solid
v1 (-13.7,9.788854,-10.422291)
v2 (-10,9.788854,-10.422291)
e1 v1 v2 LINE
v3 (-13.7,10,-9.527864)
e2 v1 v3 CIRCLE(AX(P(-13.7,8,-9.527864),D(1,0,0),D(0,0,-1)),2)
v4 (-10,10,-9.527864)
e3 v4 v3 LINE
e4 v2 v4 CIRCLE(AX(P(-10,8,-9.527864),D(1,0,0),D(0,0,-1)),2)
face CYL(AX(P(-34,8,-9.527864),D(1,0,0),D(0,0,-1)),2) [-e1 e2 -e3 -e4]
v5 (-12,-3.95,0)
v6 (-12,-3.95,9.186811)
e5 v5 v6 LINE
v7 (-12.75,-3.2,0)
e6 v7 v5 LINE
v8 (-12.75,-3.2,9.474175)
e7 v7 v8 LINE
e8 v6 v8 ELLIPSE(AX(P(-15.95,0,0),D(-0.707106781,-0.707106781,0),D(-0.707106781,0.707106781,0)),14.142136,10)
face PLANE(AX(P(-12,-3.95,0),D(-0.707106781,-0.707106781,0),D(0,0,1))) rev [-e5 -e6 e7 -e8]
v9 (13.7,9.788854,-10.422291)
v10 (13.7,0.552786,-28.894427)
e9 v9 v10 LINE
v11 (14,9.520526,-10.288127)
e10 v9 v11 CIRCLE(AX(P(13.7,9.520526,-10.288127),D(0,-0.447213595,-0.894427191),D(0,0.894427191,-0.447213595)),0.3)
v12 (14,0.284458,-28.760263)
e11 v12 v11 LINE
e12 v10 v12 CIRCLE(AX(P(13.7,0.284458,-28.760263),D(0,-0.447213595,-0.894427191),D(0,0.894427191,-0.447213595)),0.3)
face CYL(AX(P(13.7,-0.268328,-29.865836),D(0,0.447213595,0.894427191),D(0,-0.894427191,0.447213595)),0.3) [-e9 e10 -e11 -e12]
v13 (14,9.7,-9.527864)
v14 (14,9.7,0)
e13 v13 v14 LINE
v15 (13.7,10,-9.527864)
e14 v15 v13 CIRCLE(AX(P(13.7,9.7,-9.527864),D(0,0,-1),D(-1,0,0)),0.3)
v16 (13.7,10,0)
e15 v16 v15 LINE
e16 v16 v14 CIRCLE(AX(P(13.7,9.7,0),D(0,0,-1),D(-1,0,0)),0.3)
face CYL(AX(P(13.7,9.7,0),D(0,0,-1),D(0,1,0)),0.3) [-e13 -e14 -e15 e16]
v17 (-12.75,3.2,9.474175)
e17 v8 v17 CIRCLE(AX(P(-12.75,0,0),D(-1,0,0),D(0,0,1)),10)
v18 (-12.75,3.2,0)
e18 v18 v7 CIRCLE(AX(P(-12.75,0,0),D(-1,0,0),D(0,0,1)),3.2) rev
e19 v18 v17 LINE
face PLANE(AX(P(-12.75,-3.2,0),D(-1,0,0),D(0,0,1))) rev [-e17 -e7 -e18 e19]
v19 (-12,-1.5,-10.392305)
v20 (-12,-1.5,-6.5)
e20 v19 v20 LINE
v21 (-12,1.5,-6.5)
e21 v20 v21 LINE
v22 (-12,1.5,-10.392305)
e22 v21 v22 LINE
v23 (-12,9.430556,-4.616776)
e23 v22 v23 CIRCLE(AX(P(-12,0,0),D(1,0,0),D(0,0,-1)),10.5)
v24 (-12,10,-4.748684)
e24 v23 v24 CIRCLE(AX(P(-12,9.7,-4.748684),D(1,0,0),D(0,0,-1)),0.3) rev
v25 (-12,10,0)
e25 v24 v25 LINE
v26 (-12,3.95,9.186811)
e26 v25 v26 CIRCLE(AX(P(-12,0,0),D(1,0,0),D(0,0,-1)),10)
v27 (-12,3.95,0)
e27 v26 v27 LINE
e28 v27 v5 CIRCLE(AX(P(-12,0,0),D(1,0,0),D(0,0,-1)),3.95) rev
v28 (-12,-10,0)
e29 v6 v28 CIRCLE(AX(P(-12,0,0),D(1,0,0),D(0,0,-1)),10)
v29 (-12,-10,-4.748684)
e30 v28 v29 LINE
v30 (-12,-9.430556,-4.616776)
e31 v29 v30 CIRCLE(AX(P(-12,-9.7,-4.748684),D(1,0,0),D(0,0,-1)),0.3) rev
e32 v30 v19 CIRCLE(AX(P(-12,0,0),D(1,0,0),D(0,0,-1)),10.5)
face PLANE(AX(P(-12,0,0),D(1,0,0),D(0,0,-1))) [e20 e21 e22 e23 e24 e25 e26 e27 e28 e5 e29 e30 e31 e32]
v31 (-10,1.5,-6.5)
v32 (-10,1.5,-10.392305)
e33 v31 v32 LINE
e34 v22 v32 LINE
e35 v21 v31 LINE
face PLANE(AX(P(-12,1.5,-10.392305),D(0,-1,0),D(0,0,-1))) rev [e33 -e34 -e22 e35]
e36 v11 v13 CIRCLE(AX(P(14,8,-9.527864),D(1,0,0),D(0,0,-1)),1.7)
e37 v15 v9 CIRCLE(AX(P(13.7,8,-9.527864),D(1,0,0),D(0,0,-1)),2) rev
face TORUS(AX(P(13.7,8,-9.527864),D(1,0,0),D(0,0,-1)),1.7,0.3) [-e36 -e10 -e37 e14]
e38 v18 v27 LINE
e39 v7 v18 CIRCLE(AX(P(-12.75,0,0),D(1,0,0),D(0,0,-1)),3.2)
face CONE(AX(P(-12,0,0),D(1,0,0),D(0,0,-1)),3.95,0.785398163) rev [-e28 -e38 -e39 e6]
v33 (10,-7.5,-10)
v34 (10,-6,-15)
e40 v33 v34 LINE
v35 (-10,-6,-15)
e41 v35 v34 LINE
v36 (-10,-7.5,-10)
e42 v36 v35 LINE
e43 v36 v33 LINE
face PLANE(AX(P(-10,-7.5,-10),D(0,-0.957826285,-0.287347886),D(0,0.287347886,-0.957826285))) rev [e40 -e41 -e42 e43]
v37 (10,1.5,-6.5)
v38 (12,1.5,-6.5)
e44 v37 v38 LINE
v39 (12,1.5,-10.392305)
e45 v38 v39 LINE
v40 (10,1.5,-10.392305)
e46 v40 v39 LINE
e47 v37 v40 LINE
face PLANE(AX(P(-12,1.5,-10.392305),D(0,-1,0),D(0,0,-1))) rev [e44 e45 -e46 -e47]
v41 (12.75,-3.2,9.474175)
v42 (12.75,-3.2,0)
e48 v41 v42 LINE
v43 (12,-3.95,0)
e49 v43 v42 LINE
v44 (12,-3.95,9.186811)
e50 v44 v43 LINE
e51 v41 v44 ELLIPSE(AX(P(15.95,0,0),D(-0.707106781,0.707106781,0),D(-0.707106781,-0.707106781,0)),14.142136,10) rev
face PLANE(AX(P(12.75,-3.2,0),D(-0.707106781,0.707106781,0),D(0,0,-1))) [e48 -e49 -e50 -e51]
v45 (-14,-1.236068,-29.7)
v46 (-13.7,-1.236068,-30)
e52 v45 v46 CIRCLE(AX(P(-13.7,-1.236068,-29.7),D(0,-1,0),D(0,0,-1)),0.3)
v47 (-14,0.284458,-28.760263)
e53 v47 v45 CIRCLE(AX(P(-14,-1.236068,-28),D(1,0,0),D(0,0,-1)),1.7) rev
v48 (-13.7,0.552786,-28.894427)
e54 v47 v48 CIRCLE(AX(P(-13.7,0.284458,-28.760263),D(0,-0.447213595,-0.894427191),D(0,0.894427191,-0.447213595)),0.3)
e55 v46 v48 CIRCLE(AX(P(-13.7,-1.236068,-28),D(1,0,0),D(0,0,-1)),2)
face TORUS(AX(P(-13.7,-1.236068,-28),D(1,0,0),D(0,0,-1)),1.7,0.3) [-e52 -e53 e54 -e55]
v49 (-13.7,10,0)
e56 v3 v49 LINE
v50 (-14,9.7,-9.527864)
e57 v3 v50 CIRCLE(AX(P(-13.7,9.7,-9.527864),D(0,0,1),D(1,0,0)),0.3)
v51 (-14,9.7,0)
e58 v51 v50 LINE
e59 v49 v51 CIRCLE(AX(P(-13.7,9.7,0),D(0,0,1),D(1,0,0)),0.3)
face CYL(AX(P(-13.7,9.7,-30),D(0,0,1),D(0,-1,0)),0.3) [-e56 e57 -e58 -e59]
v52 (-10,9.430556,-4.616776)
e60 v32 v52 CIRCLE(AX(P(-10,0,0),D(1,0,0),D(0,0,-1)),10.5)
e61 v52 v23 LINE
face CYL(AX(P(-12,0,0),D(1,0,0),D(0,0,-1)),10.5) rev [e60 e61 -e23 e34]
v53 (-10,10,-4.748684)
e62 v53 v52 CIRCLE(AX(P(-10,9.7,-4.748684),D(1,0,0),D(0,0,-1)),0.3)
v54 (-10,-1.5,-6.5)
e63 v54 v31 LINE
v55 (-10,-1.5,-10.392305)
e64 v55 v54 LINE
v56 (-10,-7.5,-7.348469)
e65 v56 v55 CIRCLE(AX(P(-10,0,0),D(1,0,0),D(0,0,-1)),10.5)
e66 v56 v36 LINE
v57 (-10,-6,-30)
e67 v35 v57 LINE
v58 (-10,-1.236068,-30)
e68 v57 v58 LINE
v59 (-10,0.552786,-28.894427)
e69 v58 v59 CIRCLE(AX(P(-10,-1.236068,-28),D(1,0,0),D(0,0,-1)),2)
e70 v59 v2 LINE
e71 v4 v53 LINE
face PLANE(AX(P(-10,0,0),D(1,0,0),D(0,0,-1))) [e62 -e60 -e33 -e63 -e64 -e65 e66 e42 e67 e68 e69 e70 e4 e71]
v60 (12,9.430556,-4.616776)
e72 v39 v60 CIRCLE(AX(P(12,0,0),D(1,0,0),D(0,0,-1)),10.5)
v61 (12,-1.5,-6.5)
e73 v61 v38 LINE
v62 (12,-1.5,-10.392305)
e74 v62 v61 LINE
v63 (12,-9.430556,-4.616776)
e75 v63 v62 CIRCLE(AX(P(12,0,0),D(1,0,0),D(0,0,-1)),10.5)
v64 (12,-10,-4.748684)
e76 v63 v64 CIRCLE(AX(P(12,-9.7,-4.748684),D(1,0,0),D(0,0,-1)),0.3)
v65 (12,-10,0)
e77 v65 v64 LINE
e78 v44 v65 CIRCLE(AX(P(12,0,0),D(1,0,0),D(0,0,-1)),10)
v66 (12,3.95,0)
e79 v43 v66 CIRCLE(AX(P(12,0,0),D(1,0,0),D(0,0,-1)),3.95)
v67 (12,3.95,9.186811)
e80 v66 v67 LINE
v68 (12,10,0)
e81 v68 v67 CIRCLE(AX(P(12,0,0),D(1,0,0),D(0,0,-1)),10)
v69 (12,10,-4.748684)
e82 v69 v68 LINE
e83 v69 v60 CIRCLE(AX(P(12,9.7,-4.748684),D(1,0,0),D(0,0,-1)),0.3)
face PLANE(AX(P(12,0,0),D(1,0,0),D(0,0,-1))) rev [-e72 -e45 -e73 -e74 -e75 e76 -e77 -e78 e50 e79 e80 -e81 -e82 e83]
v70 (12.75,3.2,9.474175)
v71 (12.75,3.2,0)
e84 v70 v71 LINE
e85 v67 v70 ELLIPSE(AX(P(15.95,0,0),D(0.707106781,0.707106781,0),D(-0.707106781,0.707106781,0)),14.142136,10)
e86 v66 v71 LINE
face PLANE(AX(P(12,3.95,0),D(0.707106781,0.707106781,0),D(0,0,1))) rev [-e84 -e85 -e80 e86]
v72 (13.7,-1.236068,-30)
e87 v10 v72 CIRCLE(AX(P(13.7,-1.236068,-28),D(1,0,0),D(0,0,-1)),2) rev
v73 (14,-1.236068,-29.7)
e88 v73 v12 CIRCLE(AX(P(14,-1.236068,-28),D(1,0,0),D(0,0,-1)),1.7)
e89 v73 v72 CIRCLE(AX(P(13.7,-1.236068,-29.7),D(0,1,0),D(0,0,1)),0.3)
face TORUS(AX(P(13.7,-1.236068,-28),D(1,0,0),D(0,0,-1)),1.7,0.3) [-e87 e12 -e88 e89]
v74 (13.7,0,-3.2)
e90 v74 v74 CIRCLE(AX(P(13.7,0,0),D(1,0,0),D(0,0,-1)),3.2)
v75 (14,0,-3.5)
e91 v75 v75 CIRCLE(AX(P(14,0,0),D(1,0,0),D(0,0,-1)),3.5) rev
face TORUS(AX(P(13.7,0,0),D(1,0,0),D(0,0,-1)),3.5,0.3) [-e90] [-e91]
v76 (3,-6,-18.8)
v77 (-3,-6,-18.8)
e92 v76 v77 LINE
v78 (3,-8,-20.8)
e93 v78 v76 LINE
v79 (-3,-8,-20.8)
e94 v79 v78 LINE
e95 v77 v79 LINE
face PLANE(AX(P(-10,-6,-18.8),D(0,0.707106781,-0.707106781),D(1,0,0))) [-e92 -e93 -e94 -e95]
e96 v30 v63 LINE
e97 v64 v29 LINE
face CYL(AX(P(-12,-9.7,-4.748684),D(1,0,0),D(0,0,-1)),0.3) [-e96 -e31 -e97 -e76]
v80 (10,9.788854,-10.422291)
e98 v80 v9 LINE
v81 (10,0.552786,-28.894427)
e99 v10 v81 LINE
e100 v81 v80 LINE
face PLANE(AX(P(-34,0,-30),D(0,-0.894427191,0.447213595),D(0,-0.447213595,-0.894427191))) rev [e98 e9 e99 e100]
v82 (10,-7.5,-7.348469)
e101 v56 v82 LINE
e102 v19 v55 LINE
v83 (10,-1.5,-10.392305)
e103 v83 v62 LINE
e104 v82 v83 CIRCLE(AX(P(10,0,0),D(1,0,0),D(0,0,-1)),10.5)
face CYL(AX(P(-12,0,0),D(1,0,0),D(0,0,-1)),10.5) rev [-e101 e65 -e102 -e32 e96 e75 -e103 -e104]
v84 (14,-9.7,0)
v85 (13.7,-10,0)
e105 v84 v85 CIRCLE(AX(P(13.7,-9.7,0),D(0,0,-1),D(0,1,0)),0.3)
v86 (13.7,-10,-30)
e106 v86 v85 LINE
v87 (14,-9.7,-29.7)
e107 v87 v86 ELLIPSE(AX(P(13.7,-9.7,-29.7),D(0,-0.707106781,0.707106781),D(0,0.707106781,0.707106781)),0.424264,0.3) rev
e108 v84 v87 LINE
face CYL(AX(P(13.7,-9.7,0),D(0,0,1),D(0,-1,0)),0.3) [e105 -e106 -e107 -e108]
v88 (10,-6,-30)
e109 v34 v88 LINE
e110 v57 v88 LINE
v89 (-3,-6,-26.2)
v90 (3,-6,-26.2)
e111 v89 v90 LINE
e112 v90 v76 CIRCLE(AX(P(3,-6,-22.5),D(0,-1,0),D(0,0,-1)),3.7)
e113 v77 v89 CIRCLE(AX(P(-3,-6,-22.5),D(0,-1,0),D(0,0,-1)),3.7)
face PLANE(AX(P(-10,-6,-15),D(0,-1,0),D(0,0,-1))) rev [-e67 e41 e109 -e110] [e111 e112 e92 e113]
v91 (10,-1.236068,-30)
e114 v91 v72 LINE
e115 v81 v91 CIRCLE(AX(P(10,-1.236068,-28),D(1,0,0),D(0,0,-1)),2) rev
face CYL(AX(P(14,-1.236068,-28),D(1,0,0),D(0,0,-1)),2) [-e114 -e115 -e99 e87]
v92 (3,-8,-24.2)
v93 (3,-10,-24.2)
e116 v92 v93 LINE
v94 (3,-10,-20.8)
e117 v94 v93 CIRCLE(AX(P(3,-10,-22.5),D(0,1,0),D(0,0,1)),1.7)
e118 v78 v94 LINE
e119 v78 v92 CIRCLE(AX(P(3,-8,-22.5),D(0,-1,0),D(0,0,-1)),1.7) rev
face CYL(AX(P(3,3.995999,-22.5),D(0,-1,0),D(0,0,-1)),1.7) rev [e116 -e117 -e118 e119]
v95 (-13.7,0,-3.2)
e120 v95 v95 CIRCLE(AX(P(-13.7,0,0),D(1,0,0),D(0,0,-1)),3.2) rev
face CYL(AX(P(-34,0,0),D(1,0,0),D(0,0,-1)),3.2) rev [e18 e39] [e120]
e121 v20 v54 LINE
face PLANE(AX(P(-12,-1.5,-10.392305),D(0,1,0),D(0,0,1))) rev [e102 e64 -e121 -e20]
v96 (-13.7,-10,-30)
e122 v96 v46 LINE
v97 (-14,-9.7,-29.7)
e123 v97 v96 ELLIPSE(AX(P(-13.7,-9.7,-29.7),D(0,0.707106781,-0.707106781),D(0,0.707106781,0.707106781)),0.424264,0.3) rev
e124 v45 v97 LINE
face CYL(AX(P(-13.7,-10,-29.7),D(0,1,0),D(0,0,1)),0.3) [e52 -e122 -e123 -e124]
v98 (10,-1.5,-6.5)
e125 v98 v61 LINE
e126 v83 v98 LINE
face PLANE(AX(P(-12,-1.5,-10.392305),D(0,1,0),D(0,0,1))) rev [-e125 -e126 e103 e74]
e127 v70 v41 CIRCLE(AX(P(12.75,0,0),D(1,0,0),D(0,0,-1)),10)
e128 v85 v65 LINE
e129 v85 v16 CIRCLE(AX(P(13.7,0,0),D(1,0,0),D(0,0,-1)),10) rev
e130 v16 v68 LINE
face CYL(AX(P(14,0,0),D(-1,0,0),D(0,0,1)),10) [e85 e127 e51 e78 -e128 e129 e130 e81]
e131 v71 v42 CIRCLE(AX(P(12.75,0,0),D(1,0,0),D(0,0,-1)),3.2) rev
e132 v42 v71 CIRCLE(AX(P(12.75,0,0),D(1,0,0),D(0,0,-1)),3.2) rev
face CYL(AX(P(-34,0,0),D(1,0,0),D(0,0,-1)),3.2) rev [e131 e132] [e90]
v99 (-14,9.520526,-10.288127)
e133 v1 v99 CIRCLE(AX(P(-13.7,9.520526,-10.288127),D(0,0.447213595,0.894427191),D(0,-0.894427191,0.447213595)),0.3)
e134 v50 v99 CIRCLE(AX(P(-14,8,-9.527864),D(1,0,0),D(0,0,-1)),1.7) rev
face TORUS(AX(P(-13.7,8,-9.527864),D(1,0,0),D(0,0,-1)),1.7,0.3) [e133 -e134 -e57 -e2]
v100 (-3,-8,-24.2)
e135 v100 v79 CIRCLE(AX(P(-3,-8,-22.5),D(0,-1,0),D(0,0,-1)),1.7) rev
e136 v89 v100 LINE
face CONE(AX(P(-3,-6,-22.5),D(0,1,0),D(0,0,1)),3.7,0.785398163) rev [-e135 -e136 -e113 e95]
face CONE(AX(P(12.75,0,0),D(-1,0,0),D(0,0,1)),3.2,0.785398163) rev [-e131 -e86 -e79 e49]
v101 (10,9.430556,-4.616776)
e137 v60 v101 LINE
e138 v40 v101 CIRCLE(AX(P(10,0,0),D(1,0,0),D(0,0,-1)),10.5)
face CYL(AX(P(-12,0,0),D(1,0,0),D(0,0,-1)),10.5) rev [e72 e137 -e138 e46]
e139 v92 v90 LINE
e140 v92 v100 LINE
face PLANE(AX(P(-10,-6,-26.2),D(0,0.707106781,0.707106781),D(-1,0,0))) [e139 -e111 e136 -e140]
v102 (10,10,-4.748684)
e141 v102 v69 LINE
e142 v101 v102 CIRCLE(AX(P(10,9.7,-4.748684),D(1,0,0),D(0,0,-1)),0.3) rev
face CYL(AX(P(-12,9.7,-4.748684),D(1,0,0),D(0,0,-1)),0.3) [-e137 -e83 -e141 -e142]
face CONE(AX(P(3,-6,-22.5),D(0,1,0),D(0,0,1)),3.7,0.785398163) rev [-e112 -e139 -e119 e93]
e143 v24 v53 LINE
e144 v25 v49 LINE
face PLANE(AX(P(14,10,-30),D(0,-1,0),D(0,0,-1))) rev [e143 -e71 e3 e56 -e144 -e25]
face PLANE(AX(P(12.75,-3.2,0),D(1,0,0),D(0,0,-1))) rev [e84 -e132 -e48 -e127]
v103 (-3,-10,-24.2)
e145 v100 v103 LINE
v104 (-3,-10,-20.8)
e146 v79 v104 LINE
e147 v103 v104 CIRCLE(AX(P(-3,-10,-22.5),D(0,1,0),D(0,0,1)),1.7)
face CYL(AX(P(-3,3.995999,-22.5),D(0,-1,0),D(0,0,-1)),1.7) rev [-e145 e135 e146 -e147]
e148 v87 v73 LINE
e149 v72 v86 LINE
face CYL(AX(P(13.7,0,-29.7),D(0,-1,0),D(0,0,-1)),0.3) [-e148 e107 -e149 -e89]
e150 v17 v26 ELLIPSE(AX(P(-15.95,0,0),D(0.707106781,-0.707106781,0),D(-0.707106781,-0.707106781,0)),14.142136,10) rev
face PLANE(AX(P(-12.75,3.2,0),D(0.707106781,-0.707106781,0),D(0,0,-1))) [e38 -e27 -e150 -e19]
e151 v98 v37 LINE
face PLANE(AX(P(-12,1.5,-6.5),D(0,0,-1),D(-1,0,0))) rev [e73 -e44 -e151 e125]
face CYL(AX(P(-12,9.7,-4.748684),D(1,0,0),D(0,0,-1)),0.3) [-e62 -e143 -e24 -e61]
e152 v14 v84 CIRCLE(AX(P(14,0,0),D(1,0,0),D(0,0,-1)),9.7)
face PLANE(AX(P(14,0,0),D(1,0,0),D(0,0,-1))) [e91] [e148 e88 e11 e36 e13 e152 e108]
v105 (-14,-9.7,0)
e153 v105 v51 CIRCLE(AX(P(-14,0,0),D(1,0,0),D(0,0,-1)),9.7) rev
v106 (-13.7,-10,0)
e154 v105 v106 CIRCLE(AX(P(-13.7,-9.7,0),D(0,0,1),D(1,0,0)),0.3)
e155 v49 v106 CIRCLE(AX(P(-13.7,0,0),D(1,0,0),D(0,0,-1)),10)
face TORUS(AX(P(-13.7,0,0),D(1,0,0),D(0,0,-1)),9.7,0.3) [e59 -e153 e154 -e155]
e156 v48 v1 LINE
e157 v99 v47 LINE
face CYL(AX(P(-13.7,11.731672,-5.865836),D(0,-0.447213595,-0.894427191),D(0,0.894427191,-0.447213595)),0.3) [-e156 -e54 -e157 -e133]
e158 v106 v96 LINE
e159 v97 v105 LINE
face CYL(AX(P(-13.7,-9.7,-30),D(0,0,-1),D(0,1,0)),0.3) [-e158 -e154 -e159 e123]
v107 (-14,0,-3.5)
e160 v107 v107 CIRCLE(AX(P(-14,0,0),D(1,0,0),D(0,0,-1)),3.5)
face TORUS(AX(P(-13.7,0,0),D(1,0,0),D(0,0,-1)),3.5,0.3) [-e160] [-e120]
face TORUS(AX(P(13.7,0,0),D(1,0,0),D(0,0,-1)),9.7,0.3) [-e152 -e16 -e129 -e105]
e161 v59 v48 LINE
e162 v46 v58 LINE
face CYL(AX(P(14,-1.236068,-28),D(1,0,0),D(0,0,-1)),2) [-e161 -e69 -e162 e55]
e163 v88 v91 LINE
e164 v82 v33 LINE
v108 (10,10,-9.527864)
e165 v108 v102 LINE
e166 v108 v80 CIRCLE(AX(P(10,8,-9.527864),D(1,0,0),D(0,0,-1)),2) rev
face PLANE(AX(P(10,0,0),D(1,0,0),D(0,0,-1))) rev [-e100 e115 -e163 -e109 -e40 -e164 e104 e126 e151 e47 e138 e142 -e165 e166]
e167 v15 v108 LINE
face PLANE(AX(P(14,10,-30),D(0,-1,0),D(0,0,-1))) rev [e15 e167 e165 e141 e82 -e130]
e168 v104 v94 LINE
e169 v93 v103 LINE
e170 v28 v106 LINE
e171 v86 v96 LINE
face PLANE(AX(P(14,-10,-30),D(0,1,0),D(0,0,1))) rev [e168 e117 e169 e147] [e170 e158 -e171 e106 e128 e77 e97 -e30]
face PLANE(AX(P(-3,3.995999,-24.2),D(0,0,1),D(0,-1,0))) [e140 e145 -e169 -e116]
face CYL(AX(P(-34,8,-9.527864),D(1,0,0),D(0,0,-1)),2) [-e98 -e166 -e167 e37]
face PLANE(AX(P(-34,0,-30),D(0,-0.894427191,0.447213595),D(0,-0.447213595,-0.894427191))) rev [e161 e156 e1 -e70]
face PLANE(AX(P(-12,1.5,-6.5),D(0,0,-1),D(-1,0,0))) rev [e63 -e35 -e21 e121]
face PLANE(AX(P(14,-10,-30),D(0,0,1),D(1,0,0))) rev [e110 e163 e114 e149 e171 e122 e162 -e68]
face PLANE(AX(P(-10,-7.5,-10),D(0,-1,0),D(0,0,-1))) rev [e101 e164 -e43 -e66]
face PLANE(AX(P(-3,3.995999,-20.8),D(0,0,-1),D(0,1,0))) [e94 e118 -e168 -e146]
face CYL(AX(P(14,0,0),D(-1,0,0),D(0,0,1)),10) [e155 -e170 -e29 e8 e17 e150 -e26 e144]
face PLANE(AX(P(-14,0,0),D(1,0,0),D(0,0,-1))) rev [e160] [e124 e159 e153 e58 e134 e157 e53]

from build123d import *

# Parameters (mm, degrees)
BOSS_EXTRUDE1_DEPTH = 14
SKETCH2_R           = 3.2
CUT_EXTRUDE1_DEPTH  = 48
CUT_EXTRUDE2_DEPTH  = 10
CUT_EXTRUDE4_DEPTH  = 12
FILLET1_R           = 0.3
CUT_EXTRUDE3_DEPTH  = 4
CHAMFER1_SIZE       = 2
FILLET2_R           = 2
FILLET3_R           = 0.3
SKETCH7_W           = 25.5
SKETCH7_H           = 10
CUT_EXTRUDE5_DEPTH  = 3.2
CHAMFER2_SIZE       = 0.75


with BuildPart() as part:
    # Sketch1 → Boss-Extrude1 (new, symmetric)
    with BuildSketch(Plane(origin=(0, 0, 0), x_dir=(0, 0, -1), z_dir=(1, 0, 0))):
        with BuildLine():
            Line((30, -10), (0, -10))
            ThreePointArc((0, -10), (-10, 0), (0, 10))
            Line((0, 10), (30, 10))
            Line((30, 10), (30, -10))
        make_face()
    extrude(amount=BOSS_EXTRUDE1_DEPTH, both=True)

    # Sketch2 → Cut-Extrude1 (cut)
    with BuildSketch(Plane(origin=(14, 0, 0), x_dir=(0, 0, -1), z_dir=(1, 0, 0))):
        Circle(SKETCH2_R)
        Polygon((30, 0), (10, 10), (30, 10), align=None)
    extrude(amount=-CUT_EXTRUDE1_DEPTH, mode=Mode.SUBTRACT)

    # Sketch4 → Cut-Extrude2 (cut, symmetric)
    with BuildSketch(Plane(origin=(0, 0, 0), x_dir=(0, 0, -1), z_dir=(1, 0, 0))):
        with BuildLine():
            Line((0, -10), (1.5, -10))
            Line((1.5, -10), (1.5, -7.5))
            Line((1.5, -7.5), (10, -7.5))
            Line((10, -7.5), (15, -6))
            Line((15, -6), (30, -6))
            Line((30, -6), (30, 0))
            Line((30, 0), (10, 10))
            Line((10, 10), (0, 10))
            ThreePointArc((0, 10), (-10, 0), (0, -10))
        make_face()
    extrude(amount=CUT_EXTRUDE2_DEPTH, both=True, mode=Mode.SUBTRACT)

    # Sketch6 → Cut-Extrude4 (cut, symmetric)
    with BuildSketch(Plane(origin=(0, 0, 0), x_dir=(0, 0, -1), z_dir=(1, 0, 0))):
        with BuildLine():
            Line((10.392304845, 1.5), (6.5, 1.5))
            Line((6.5, 1.5), (6.5, -1.5))
            Line((6.5, -1.5), (10.392304845, -1.5))
            ThreePointArc((10.392304845, -1.5), (-10.5, 0), (10.392304845, 1.5))
        make_face()
    extrude(amount=CUT_EXTRUDE4_DEPTH, both=True, mode=Mode.SUBTRACT)

    # Fillet1
    fillet1_edges = [part.edges().sort_by_distance(p)[0] for p in [
        (0, -10, -3.201562119),
        (-11, 10, -3.201562119),
        (11, 10, -3.201562119),
    ]]
    fillet(fillet1_edges, radius=FILLET1_R)

    # Sketch5 → Cut-Extrude3 (cut)
    with BuildSketch(Plane(origin=(0, -10, 0), x_dir=(1, 0, 0), z_dir=(0, 1, 0))):
        with BuildLine():
            Line((-3, 24.2), (3, 24.2))
            ThreePointArc((3, 24.2), (4.7, 22.5), (3, 20.8))
            Line((3, 20.8), (-3, 20.8))
            ThreePointArc((-3, 20.8), (-4.7, 22.5), (-3, 24.2))
        make_face()
    extrude(amount=CUT_EXTRUDE3_DEPTH, mode=Mode.SUBTRACT)

    # Chamfer1
    chamfer1_edges = [part.edges().sort_by_distance(p)[0] for p in [
        (0, -6, -24.2),
        (4.7, -6, -22.5),
        (0, -6, -20.8),
        (-4.7, -6, -22.5),
    ]]
    chamfer(chamfer1_edges, length=CHAMFER1_SIZE)

    # Fillet2
    fillet2_edges = [part.edges().sort_by_distance(p)[0] for p in [
        (-12, 0, -30),
        (-12, 10, -10),
        (12, 10, -10),
        (12, 0, -30),
    ]]
    fillet(fillet2_edges, radius=FILLET2_R)

    # Fillet3
    fillet3_edges = [part.edges().sort_by_distance(p)[0] for p in [
        (14, -5.618033989, -30),
        (-14, 5.170820393, -19.658359214),
        (-14, 10, -4.763932023),
        (-14, -0.184605753, -29.701301617),
        (-14, 9.946497979, -9.987369886),
        (14, 5.170820393, -19.658359214),
        (14, 10, -4.763932023),
        (14, -0.184605753, -29.701301617),
        (14, 9.946497979, -9.987369886),
        (-14, 0, 3.2),
        (14, 0, 3.2),
        (14, 0, 10),
        (-14, -5.618033989, -30),
        (-14, -10, -15),
        (-14, 0, 10),
        (14, -10, -15),
    ]]
    fillet(fillet3_edges, radius=FILLET3_R)

    # Sketch7 → Cut-Extrude5 (cut, symmetric)
    with BuildSketch(Plane(origin=(0, 0, 0), x_dir=(1, 0, 0), z_dir=(0, 1, 0))):
        with Locations((0, -5)):
            Rectangle(SKETCH7_W, SKETCH7_H)
    extrude(amount=CUT_EXTRUDE5_DEPTH, both=True, mode=Mode.SUBTRACT)

    # Chamfer2
    chamfer2_edges = [part.edges().sort_by_distance(p)[0] for p in [
        (12, 3.2, 4.737087713),
        (12, -3.2, 4.737087713),
        (12, -2.2627417, -2.2627417),
        (-12, 3.2, 4.737087713),
        (-12, -3.2, 4.737087713),
        (-12, 2.2627417, -2.2627417),
    ]]
    chamfer(chamfer2_edges, length=CHAMFER2_SIZE - 0.0001)  # a hair under: the kernel refuses the full size


solid = part.part
